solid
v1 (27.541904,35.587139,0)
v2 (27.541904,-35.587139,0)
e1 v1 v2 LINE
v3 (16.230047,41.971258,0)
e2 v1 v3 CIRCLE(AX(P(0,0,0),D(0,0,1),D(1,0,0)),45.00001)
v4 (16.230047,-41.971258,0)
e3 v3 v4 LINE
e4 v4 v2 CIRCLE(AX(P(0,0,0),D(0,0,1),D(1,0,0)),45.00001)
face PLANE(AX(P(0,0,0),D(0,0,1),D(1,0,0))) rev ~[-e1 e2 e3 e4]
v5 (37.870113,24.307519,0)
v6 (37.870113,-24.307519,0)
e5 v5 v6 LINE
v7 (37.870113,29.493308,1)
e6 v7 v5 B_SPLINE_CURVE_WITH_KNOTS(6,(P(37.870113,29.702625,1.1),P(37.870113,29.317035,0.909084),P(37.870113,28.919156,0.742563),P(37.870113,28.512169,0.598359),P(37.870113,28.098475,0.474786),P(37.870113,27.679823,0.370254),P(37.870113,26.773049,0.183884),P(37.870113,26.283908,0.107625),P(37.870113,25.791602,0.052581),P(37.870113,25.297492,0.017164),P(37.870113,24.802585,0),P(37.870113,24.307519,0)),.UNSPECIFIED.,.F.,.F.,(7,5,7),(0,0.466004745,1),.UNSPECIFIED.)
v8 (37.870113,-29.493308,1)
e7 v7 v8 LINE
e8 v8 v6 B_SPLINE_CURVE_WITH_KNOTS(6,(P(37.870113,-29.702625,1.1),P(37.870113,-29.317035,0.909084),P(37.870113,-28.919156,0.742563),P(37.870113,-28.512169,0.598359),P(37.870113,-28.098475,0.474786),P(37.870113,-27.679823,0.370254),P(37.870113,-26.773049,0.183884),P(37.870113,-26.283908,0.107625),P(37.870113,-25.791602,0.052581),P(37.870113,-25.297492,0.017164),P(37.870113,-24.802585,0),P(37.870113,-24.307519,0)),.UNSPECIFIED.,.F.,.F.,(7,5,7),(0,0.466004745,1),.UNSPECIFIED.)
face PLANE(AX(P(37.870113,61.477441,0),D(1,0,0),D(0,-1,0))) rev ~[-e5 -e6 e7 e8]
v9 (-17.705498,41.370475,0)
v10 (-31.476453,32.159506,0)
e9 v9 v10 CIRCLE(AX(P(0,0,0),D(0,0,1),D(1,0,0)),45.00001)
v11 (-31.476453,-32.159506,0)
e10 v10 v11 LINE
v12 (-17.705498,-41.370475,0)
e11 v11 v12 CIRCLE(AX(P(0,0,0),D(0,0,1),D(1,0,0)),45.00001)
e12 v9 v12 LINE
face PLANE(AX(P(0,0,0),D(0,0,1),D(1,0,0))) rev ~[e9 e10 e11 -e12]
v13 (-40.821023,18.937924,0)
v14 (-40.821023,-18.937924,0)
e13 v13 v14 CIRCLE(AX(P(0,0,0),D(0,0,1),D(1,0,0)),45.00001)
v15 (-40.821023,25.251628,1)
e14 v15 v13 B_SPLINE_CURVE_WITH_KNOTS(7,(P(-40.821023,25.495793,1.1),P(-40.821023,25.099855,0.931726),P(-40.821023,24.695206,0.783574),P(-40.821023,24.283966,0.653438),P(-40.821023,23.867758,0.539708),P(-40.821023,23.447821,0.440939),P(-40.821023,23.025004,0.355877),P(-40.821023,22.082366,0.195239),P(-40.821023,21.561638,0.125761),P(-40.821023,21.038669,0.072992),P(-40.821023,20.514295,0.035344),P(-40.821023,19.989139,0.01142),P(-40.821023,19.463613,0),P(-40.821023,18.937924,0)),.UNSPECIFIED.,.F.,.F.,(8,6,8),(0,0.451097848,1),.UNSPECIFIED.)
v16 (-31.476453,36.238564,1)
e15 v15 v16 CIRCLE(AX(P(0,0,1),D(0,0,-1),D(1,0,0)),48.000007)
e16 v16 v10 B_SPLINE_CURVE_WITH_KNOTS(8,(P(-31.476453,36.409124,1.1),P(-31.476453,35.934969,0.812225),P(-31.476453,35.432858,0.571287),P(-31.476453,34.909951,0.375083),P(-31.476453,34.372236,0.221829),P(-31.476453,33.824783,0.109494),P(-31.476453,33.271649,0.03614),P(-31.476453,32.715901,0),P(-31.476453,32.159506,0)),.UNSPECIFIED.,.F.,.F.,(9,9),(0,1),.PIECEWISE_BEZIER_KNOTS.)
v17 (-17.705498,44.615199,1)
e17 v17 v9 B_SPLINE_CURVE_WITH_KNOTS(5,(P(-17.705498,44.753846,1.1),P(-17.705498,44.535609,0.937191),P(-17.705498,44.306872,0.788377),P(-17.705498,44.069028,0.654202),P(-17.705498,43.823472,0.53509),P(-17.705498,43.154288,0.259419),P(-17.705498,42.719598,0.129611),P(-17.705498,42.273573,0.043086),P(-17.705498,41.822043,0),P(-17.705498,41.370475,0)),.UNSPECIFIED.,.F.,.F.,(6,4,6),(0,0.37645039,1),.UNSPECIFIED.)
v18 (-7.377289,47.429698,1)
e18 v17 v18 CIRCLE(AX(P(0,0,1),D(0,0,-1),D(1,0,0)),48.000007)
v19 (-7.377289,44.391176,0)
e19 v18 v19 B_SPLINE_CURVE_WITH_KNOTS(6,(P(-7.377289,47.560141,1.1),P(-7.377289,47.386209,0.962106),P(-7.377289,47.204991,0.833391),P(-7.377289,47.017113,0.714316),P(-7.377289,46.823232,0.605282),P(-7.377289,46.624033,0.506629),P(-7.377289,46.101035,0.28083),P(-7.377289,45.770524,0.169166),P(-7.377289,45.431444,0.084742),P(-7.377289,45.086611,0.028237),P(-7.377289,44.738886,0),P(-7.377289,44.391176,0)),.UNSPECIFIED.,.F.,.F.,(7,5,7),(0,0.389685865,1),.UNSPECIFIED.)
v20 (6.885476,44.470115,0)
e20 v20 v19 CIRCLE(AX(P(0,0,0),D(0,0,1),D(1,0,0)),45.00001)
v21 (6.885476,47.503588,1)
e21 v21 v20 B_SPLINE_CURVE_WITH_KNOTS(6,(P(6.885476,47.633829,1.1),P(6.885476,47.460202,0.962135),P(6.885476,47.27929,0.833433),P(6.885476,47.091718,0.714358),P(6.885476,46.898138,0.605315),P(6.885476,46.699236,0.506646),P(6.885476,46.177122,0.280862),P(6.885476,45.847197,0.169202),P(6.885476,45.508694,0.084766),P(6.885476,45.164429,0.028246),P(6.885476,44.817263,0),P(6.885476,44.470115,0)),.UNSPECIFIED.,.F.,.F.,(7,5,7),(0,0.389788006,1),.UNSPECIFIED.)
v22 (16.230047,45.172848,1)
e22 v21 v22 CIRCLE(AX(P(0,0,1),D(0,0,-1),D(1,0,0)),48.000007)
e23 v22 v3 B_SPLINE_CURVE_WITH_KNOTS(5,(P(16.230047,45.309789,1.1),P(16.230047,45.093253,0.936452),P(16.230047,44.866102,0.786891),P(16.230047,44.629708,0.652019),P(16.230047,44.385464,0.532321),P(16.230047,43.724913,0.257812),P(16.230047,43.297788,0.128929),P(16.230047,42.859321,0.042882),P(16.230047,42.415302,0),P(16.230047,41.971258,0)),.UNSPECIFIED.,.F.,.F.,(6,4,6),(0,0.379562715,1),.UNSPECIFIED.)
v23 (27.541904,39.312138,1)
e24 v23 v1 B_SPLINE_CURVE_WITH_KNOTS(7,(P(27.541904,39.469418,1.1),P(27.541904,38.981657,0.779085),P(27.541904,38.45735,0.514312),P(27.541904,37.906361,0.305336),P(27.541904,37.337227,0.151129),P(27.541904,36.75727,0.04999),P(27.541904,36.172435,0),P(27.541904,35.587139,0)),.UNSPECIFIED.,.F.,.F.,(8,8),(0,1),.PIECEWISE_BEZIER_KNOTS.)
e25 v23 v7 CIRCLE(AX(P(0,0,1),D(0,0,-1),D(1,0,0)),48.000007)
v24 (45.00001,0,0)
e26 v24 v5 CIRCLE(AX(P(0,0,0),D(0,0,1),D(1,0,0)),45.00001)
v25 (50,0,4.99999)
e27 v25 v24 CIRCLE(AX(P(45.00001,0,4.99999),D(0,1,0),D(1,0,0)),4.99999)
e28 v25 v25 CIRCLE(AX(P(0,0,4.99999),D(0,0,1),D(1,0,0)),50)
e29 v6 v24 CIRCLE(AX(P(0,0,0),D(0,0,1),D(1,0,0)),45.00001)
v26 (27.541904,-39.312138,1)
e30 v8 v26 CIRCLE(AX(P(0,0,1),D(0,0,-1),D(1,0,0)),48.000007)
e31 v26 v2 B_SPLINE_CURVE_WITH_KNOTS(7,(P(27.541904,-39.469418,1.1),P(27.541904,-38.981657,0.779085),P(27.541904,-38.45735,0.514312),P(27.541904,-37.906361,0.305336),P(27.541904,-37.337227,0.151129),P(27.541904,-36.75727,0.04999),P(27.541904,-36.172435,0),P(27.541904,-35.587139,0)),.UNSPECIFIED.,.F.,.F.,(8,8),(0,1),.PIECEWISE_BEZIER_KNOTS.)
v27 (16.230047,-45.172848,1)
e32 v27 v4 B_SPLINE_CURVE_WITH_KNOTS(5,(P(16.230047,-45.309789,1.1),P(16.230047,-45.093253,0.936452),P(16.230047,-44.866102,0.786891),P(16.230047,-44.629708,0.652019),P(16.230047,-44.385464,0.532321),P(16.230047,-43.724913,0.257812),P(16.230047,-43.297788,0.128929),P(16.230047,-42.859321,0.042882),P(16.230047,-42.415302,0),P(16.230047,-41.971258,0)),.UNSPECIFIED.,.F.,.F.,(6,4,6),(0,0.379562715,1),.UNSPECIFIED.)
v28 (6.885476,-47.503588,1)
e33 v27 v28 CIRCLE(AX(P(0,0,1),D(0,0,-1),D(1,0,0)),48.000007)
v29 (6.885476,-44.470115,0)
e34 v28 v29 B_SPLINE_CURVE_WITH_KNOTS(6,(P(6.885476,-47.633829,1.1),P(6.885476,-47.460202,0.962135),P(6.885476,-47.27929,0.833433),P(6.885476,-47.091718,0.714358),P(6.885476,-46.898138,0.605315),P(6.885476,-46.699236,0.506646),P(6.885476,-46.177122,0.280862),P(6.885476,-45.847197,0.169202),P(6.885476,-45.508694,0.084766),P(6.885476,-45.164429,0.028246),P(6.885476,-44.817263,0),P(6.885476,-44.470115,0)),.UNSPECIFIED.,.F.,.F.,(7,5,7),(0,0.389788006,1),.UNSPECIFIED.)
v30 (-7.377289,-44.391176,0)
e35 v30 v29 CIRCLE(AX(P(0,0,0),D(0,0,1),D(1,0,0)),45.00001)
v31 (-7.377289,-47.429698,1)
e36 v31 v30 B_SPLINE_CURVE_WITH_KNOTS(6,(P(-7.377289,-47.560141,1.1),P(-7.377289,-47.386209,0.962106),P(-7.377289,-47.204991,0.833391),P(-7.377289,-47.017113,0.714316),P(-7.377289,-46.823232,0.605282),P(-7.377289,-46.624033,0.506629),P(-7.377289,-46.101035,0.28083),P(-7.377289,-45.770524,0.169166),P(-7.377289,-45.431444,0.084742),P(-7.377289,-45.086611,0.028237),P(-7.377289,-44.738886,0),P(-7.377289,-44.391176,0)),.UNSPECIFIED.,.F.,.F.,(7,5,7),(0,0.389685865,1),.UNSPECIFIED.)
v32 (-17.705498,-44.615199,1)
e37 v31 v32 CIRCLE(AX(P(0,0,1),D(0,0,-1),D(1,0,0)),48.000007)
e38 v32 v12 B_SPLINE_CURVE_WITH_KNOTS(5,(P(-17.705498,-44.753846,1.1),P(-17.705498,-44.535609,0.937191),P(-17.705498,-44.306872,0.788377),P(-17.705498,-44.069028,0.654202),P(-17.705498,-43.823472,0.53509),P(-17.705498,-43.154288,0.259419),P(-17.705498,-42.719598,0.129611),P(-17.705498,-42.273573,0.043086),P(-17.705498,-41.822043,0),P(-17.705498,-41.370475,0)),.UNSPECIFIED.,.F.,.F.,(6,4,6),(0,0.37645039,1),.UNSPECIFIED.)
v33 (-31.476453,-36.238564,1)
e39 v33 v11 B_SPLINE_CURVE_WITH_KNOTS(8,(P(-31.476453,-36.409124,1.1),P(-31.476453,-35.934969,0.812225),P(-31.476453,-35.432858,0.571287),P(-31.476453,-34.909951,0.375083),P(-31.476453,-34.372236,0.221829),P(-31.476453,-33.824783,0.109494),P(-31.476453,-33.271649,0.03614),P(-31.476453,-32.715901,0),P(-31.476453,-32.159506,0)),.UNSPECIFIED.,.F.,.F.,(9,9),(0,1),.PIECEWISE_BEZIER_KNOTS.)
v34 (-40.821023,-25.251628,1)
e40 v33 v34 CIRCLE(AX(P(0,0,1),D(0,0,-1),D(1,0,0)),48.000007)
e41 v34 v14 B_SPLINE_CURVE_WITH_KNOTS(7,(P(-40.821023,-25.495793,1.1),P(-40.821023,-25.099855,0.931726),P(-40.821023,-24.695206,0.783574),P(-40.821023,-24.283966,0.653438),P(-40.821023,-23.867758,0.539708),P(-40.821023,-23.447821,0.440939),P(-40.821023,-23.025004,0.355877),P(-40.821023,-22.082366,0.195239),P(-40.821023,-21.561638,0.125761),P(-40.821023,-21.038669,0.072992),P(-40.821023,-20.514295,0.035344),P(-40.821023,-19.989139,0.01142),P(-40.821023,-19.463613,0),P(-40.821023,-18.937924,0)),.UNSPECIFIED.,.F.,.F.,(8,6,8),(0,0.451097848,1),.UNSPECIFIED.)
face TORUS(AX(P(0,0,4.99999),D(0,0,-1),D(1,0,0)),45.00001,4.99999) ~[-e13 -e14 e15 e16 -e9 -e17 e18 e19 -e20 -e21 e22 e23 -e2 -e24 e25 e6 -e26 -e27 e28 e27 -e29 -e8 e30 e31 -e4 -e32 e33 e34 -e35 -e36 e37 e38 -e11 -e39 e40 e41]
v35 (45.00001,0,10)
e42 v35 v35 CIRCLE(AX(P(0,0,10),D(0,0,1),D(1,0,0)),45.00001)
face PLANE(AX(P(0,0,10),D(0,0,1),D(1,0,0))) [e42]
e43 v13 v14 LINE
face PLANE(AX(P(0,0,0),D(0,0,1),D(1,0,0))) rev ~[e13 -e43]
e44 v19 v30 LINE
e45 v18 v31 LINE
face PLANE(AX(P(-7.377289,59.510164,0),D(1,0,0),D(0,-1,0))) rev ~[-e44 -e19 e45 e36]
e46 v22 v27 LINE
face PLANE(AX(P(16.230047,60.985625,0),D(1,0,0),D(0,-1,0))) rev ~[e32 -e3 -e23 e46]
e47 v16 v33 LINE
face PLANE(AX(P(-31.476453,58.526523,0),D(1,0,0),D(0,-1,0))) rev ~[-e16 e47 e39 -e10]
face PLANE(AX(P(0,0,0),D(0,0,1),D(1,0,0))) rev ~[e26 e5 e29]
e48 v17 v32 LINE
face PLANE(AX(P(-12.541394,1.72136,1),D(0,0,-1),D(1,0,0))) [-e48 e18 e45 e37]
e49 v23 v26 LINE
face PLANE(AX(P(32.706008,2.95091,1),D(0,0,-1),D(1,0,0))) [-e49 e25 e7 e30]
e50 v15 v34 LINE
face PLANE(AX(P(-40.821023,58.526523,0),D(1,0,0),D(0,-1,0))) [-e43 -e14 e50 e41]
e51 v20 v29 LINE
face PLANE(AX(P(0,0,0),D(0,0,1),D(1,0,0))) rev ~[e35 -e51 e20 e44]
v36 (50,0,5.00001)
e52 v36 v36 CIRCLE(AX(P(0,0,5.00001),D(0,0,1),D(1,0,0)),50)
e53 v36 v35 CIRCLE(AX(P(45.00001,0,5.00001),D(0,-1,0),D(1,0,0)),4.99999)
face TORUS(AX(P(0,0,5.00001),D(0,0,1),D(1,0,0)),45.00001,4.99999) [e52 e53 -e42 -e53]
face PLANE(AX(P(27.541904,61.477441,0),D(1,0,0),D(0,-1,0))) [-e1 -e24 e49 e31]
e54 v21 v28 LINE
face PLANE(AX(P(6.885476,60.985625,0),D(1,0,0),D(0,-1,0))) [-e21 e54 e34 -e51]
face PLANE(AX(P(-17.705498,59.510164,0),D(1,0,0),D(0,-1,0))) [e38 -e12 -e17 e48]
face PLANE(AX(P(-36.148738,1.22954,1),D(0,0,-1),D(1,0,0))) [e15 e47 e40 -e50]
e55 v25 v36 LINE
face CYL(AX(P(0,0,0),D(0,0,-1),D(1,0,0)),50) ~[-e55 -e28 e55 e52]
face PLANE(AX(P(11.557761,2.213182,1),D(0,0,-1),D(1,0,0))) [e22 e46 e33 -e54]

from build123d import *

# Parameters (mm, degrees)
F0_R     = 50
F1_DEPTH = 10
F2_R     = 4.99999
F3_W     = 9.3445703387
F3_H     = 114.5939677954
F3_W_2   = 10.3282090276
F3_H_2   = 115.5776083469
F3_W_3   = 9.3445708044
F3_H_3   = 117.5448857248
F3_H_4   = 117.0530617237
F4_DEPTH = 1


# Not quite as in the source:
# - a fillet or chamfer is up to 0.001 mm smaller than in the source, because OpenCascade refuses the exact size


with BuildPart() as f1:
    # F0 (on Top) → F1 (new body)
    with BuildSketch(Plane.XY):
        Circle(F0_R)
    extrude(amount=F1_DEPTH)

    # F2 (radius 5 in the source; OpenCascade refuses exactly that, so slightly less here)
    f2_edges = [f1.edges().sort_by_distance(p)[0] for p in [
        (-50, 0, 0),
        (-50, 0, 10),
    ]]
    fillet(f2_edges, radius=F2_R)

    # F3 (on face) → F4 (cut)
    with BuildSketch(Plane(origin=(0, 0, 0), x_dir=(1, 0, 0), z_dir=(0, 0, -1))):
        with Locations((-36.148738116, -1.2295395136)):
            Rectangle(F3_W, F3_H)
        with Locations((-12.5413937494, -1.7213597894)):
            Rectangle(F3_W_2, F3_H_2)
        with Locations((11.5577613469, -2.2131819278)):
            Rectangle(F3_W_3, F3_H_3)
        with Locations((32.7060082927, -2.9509104788)):
            Rectangle(F3_W_2, F3_H_4)
    extrude(amount=-F4_DEPTH, mode=Mode.SUBTRACT)


solid = f1.part
